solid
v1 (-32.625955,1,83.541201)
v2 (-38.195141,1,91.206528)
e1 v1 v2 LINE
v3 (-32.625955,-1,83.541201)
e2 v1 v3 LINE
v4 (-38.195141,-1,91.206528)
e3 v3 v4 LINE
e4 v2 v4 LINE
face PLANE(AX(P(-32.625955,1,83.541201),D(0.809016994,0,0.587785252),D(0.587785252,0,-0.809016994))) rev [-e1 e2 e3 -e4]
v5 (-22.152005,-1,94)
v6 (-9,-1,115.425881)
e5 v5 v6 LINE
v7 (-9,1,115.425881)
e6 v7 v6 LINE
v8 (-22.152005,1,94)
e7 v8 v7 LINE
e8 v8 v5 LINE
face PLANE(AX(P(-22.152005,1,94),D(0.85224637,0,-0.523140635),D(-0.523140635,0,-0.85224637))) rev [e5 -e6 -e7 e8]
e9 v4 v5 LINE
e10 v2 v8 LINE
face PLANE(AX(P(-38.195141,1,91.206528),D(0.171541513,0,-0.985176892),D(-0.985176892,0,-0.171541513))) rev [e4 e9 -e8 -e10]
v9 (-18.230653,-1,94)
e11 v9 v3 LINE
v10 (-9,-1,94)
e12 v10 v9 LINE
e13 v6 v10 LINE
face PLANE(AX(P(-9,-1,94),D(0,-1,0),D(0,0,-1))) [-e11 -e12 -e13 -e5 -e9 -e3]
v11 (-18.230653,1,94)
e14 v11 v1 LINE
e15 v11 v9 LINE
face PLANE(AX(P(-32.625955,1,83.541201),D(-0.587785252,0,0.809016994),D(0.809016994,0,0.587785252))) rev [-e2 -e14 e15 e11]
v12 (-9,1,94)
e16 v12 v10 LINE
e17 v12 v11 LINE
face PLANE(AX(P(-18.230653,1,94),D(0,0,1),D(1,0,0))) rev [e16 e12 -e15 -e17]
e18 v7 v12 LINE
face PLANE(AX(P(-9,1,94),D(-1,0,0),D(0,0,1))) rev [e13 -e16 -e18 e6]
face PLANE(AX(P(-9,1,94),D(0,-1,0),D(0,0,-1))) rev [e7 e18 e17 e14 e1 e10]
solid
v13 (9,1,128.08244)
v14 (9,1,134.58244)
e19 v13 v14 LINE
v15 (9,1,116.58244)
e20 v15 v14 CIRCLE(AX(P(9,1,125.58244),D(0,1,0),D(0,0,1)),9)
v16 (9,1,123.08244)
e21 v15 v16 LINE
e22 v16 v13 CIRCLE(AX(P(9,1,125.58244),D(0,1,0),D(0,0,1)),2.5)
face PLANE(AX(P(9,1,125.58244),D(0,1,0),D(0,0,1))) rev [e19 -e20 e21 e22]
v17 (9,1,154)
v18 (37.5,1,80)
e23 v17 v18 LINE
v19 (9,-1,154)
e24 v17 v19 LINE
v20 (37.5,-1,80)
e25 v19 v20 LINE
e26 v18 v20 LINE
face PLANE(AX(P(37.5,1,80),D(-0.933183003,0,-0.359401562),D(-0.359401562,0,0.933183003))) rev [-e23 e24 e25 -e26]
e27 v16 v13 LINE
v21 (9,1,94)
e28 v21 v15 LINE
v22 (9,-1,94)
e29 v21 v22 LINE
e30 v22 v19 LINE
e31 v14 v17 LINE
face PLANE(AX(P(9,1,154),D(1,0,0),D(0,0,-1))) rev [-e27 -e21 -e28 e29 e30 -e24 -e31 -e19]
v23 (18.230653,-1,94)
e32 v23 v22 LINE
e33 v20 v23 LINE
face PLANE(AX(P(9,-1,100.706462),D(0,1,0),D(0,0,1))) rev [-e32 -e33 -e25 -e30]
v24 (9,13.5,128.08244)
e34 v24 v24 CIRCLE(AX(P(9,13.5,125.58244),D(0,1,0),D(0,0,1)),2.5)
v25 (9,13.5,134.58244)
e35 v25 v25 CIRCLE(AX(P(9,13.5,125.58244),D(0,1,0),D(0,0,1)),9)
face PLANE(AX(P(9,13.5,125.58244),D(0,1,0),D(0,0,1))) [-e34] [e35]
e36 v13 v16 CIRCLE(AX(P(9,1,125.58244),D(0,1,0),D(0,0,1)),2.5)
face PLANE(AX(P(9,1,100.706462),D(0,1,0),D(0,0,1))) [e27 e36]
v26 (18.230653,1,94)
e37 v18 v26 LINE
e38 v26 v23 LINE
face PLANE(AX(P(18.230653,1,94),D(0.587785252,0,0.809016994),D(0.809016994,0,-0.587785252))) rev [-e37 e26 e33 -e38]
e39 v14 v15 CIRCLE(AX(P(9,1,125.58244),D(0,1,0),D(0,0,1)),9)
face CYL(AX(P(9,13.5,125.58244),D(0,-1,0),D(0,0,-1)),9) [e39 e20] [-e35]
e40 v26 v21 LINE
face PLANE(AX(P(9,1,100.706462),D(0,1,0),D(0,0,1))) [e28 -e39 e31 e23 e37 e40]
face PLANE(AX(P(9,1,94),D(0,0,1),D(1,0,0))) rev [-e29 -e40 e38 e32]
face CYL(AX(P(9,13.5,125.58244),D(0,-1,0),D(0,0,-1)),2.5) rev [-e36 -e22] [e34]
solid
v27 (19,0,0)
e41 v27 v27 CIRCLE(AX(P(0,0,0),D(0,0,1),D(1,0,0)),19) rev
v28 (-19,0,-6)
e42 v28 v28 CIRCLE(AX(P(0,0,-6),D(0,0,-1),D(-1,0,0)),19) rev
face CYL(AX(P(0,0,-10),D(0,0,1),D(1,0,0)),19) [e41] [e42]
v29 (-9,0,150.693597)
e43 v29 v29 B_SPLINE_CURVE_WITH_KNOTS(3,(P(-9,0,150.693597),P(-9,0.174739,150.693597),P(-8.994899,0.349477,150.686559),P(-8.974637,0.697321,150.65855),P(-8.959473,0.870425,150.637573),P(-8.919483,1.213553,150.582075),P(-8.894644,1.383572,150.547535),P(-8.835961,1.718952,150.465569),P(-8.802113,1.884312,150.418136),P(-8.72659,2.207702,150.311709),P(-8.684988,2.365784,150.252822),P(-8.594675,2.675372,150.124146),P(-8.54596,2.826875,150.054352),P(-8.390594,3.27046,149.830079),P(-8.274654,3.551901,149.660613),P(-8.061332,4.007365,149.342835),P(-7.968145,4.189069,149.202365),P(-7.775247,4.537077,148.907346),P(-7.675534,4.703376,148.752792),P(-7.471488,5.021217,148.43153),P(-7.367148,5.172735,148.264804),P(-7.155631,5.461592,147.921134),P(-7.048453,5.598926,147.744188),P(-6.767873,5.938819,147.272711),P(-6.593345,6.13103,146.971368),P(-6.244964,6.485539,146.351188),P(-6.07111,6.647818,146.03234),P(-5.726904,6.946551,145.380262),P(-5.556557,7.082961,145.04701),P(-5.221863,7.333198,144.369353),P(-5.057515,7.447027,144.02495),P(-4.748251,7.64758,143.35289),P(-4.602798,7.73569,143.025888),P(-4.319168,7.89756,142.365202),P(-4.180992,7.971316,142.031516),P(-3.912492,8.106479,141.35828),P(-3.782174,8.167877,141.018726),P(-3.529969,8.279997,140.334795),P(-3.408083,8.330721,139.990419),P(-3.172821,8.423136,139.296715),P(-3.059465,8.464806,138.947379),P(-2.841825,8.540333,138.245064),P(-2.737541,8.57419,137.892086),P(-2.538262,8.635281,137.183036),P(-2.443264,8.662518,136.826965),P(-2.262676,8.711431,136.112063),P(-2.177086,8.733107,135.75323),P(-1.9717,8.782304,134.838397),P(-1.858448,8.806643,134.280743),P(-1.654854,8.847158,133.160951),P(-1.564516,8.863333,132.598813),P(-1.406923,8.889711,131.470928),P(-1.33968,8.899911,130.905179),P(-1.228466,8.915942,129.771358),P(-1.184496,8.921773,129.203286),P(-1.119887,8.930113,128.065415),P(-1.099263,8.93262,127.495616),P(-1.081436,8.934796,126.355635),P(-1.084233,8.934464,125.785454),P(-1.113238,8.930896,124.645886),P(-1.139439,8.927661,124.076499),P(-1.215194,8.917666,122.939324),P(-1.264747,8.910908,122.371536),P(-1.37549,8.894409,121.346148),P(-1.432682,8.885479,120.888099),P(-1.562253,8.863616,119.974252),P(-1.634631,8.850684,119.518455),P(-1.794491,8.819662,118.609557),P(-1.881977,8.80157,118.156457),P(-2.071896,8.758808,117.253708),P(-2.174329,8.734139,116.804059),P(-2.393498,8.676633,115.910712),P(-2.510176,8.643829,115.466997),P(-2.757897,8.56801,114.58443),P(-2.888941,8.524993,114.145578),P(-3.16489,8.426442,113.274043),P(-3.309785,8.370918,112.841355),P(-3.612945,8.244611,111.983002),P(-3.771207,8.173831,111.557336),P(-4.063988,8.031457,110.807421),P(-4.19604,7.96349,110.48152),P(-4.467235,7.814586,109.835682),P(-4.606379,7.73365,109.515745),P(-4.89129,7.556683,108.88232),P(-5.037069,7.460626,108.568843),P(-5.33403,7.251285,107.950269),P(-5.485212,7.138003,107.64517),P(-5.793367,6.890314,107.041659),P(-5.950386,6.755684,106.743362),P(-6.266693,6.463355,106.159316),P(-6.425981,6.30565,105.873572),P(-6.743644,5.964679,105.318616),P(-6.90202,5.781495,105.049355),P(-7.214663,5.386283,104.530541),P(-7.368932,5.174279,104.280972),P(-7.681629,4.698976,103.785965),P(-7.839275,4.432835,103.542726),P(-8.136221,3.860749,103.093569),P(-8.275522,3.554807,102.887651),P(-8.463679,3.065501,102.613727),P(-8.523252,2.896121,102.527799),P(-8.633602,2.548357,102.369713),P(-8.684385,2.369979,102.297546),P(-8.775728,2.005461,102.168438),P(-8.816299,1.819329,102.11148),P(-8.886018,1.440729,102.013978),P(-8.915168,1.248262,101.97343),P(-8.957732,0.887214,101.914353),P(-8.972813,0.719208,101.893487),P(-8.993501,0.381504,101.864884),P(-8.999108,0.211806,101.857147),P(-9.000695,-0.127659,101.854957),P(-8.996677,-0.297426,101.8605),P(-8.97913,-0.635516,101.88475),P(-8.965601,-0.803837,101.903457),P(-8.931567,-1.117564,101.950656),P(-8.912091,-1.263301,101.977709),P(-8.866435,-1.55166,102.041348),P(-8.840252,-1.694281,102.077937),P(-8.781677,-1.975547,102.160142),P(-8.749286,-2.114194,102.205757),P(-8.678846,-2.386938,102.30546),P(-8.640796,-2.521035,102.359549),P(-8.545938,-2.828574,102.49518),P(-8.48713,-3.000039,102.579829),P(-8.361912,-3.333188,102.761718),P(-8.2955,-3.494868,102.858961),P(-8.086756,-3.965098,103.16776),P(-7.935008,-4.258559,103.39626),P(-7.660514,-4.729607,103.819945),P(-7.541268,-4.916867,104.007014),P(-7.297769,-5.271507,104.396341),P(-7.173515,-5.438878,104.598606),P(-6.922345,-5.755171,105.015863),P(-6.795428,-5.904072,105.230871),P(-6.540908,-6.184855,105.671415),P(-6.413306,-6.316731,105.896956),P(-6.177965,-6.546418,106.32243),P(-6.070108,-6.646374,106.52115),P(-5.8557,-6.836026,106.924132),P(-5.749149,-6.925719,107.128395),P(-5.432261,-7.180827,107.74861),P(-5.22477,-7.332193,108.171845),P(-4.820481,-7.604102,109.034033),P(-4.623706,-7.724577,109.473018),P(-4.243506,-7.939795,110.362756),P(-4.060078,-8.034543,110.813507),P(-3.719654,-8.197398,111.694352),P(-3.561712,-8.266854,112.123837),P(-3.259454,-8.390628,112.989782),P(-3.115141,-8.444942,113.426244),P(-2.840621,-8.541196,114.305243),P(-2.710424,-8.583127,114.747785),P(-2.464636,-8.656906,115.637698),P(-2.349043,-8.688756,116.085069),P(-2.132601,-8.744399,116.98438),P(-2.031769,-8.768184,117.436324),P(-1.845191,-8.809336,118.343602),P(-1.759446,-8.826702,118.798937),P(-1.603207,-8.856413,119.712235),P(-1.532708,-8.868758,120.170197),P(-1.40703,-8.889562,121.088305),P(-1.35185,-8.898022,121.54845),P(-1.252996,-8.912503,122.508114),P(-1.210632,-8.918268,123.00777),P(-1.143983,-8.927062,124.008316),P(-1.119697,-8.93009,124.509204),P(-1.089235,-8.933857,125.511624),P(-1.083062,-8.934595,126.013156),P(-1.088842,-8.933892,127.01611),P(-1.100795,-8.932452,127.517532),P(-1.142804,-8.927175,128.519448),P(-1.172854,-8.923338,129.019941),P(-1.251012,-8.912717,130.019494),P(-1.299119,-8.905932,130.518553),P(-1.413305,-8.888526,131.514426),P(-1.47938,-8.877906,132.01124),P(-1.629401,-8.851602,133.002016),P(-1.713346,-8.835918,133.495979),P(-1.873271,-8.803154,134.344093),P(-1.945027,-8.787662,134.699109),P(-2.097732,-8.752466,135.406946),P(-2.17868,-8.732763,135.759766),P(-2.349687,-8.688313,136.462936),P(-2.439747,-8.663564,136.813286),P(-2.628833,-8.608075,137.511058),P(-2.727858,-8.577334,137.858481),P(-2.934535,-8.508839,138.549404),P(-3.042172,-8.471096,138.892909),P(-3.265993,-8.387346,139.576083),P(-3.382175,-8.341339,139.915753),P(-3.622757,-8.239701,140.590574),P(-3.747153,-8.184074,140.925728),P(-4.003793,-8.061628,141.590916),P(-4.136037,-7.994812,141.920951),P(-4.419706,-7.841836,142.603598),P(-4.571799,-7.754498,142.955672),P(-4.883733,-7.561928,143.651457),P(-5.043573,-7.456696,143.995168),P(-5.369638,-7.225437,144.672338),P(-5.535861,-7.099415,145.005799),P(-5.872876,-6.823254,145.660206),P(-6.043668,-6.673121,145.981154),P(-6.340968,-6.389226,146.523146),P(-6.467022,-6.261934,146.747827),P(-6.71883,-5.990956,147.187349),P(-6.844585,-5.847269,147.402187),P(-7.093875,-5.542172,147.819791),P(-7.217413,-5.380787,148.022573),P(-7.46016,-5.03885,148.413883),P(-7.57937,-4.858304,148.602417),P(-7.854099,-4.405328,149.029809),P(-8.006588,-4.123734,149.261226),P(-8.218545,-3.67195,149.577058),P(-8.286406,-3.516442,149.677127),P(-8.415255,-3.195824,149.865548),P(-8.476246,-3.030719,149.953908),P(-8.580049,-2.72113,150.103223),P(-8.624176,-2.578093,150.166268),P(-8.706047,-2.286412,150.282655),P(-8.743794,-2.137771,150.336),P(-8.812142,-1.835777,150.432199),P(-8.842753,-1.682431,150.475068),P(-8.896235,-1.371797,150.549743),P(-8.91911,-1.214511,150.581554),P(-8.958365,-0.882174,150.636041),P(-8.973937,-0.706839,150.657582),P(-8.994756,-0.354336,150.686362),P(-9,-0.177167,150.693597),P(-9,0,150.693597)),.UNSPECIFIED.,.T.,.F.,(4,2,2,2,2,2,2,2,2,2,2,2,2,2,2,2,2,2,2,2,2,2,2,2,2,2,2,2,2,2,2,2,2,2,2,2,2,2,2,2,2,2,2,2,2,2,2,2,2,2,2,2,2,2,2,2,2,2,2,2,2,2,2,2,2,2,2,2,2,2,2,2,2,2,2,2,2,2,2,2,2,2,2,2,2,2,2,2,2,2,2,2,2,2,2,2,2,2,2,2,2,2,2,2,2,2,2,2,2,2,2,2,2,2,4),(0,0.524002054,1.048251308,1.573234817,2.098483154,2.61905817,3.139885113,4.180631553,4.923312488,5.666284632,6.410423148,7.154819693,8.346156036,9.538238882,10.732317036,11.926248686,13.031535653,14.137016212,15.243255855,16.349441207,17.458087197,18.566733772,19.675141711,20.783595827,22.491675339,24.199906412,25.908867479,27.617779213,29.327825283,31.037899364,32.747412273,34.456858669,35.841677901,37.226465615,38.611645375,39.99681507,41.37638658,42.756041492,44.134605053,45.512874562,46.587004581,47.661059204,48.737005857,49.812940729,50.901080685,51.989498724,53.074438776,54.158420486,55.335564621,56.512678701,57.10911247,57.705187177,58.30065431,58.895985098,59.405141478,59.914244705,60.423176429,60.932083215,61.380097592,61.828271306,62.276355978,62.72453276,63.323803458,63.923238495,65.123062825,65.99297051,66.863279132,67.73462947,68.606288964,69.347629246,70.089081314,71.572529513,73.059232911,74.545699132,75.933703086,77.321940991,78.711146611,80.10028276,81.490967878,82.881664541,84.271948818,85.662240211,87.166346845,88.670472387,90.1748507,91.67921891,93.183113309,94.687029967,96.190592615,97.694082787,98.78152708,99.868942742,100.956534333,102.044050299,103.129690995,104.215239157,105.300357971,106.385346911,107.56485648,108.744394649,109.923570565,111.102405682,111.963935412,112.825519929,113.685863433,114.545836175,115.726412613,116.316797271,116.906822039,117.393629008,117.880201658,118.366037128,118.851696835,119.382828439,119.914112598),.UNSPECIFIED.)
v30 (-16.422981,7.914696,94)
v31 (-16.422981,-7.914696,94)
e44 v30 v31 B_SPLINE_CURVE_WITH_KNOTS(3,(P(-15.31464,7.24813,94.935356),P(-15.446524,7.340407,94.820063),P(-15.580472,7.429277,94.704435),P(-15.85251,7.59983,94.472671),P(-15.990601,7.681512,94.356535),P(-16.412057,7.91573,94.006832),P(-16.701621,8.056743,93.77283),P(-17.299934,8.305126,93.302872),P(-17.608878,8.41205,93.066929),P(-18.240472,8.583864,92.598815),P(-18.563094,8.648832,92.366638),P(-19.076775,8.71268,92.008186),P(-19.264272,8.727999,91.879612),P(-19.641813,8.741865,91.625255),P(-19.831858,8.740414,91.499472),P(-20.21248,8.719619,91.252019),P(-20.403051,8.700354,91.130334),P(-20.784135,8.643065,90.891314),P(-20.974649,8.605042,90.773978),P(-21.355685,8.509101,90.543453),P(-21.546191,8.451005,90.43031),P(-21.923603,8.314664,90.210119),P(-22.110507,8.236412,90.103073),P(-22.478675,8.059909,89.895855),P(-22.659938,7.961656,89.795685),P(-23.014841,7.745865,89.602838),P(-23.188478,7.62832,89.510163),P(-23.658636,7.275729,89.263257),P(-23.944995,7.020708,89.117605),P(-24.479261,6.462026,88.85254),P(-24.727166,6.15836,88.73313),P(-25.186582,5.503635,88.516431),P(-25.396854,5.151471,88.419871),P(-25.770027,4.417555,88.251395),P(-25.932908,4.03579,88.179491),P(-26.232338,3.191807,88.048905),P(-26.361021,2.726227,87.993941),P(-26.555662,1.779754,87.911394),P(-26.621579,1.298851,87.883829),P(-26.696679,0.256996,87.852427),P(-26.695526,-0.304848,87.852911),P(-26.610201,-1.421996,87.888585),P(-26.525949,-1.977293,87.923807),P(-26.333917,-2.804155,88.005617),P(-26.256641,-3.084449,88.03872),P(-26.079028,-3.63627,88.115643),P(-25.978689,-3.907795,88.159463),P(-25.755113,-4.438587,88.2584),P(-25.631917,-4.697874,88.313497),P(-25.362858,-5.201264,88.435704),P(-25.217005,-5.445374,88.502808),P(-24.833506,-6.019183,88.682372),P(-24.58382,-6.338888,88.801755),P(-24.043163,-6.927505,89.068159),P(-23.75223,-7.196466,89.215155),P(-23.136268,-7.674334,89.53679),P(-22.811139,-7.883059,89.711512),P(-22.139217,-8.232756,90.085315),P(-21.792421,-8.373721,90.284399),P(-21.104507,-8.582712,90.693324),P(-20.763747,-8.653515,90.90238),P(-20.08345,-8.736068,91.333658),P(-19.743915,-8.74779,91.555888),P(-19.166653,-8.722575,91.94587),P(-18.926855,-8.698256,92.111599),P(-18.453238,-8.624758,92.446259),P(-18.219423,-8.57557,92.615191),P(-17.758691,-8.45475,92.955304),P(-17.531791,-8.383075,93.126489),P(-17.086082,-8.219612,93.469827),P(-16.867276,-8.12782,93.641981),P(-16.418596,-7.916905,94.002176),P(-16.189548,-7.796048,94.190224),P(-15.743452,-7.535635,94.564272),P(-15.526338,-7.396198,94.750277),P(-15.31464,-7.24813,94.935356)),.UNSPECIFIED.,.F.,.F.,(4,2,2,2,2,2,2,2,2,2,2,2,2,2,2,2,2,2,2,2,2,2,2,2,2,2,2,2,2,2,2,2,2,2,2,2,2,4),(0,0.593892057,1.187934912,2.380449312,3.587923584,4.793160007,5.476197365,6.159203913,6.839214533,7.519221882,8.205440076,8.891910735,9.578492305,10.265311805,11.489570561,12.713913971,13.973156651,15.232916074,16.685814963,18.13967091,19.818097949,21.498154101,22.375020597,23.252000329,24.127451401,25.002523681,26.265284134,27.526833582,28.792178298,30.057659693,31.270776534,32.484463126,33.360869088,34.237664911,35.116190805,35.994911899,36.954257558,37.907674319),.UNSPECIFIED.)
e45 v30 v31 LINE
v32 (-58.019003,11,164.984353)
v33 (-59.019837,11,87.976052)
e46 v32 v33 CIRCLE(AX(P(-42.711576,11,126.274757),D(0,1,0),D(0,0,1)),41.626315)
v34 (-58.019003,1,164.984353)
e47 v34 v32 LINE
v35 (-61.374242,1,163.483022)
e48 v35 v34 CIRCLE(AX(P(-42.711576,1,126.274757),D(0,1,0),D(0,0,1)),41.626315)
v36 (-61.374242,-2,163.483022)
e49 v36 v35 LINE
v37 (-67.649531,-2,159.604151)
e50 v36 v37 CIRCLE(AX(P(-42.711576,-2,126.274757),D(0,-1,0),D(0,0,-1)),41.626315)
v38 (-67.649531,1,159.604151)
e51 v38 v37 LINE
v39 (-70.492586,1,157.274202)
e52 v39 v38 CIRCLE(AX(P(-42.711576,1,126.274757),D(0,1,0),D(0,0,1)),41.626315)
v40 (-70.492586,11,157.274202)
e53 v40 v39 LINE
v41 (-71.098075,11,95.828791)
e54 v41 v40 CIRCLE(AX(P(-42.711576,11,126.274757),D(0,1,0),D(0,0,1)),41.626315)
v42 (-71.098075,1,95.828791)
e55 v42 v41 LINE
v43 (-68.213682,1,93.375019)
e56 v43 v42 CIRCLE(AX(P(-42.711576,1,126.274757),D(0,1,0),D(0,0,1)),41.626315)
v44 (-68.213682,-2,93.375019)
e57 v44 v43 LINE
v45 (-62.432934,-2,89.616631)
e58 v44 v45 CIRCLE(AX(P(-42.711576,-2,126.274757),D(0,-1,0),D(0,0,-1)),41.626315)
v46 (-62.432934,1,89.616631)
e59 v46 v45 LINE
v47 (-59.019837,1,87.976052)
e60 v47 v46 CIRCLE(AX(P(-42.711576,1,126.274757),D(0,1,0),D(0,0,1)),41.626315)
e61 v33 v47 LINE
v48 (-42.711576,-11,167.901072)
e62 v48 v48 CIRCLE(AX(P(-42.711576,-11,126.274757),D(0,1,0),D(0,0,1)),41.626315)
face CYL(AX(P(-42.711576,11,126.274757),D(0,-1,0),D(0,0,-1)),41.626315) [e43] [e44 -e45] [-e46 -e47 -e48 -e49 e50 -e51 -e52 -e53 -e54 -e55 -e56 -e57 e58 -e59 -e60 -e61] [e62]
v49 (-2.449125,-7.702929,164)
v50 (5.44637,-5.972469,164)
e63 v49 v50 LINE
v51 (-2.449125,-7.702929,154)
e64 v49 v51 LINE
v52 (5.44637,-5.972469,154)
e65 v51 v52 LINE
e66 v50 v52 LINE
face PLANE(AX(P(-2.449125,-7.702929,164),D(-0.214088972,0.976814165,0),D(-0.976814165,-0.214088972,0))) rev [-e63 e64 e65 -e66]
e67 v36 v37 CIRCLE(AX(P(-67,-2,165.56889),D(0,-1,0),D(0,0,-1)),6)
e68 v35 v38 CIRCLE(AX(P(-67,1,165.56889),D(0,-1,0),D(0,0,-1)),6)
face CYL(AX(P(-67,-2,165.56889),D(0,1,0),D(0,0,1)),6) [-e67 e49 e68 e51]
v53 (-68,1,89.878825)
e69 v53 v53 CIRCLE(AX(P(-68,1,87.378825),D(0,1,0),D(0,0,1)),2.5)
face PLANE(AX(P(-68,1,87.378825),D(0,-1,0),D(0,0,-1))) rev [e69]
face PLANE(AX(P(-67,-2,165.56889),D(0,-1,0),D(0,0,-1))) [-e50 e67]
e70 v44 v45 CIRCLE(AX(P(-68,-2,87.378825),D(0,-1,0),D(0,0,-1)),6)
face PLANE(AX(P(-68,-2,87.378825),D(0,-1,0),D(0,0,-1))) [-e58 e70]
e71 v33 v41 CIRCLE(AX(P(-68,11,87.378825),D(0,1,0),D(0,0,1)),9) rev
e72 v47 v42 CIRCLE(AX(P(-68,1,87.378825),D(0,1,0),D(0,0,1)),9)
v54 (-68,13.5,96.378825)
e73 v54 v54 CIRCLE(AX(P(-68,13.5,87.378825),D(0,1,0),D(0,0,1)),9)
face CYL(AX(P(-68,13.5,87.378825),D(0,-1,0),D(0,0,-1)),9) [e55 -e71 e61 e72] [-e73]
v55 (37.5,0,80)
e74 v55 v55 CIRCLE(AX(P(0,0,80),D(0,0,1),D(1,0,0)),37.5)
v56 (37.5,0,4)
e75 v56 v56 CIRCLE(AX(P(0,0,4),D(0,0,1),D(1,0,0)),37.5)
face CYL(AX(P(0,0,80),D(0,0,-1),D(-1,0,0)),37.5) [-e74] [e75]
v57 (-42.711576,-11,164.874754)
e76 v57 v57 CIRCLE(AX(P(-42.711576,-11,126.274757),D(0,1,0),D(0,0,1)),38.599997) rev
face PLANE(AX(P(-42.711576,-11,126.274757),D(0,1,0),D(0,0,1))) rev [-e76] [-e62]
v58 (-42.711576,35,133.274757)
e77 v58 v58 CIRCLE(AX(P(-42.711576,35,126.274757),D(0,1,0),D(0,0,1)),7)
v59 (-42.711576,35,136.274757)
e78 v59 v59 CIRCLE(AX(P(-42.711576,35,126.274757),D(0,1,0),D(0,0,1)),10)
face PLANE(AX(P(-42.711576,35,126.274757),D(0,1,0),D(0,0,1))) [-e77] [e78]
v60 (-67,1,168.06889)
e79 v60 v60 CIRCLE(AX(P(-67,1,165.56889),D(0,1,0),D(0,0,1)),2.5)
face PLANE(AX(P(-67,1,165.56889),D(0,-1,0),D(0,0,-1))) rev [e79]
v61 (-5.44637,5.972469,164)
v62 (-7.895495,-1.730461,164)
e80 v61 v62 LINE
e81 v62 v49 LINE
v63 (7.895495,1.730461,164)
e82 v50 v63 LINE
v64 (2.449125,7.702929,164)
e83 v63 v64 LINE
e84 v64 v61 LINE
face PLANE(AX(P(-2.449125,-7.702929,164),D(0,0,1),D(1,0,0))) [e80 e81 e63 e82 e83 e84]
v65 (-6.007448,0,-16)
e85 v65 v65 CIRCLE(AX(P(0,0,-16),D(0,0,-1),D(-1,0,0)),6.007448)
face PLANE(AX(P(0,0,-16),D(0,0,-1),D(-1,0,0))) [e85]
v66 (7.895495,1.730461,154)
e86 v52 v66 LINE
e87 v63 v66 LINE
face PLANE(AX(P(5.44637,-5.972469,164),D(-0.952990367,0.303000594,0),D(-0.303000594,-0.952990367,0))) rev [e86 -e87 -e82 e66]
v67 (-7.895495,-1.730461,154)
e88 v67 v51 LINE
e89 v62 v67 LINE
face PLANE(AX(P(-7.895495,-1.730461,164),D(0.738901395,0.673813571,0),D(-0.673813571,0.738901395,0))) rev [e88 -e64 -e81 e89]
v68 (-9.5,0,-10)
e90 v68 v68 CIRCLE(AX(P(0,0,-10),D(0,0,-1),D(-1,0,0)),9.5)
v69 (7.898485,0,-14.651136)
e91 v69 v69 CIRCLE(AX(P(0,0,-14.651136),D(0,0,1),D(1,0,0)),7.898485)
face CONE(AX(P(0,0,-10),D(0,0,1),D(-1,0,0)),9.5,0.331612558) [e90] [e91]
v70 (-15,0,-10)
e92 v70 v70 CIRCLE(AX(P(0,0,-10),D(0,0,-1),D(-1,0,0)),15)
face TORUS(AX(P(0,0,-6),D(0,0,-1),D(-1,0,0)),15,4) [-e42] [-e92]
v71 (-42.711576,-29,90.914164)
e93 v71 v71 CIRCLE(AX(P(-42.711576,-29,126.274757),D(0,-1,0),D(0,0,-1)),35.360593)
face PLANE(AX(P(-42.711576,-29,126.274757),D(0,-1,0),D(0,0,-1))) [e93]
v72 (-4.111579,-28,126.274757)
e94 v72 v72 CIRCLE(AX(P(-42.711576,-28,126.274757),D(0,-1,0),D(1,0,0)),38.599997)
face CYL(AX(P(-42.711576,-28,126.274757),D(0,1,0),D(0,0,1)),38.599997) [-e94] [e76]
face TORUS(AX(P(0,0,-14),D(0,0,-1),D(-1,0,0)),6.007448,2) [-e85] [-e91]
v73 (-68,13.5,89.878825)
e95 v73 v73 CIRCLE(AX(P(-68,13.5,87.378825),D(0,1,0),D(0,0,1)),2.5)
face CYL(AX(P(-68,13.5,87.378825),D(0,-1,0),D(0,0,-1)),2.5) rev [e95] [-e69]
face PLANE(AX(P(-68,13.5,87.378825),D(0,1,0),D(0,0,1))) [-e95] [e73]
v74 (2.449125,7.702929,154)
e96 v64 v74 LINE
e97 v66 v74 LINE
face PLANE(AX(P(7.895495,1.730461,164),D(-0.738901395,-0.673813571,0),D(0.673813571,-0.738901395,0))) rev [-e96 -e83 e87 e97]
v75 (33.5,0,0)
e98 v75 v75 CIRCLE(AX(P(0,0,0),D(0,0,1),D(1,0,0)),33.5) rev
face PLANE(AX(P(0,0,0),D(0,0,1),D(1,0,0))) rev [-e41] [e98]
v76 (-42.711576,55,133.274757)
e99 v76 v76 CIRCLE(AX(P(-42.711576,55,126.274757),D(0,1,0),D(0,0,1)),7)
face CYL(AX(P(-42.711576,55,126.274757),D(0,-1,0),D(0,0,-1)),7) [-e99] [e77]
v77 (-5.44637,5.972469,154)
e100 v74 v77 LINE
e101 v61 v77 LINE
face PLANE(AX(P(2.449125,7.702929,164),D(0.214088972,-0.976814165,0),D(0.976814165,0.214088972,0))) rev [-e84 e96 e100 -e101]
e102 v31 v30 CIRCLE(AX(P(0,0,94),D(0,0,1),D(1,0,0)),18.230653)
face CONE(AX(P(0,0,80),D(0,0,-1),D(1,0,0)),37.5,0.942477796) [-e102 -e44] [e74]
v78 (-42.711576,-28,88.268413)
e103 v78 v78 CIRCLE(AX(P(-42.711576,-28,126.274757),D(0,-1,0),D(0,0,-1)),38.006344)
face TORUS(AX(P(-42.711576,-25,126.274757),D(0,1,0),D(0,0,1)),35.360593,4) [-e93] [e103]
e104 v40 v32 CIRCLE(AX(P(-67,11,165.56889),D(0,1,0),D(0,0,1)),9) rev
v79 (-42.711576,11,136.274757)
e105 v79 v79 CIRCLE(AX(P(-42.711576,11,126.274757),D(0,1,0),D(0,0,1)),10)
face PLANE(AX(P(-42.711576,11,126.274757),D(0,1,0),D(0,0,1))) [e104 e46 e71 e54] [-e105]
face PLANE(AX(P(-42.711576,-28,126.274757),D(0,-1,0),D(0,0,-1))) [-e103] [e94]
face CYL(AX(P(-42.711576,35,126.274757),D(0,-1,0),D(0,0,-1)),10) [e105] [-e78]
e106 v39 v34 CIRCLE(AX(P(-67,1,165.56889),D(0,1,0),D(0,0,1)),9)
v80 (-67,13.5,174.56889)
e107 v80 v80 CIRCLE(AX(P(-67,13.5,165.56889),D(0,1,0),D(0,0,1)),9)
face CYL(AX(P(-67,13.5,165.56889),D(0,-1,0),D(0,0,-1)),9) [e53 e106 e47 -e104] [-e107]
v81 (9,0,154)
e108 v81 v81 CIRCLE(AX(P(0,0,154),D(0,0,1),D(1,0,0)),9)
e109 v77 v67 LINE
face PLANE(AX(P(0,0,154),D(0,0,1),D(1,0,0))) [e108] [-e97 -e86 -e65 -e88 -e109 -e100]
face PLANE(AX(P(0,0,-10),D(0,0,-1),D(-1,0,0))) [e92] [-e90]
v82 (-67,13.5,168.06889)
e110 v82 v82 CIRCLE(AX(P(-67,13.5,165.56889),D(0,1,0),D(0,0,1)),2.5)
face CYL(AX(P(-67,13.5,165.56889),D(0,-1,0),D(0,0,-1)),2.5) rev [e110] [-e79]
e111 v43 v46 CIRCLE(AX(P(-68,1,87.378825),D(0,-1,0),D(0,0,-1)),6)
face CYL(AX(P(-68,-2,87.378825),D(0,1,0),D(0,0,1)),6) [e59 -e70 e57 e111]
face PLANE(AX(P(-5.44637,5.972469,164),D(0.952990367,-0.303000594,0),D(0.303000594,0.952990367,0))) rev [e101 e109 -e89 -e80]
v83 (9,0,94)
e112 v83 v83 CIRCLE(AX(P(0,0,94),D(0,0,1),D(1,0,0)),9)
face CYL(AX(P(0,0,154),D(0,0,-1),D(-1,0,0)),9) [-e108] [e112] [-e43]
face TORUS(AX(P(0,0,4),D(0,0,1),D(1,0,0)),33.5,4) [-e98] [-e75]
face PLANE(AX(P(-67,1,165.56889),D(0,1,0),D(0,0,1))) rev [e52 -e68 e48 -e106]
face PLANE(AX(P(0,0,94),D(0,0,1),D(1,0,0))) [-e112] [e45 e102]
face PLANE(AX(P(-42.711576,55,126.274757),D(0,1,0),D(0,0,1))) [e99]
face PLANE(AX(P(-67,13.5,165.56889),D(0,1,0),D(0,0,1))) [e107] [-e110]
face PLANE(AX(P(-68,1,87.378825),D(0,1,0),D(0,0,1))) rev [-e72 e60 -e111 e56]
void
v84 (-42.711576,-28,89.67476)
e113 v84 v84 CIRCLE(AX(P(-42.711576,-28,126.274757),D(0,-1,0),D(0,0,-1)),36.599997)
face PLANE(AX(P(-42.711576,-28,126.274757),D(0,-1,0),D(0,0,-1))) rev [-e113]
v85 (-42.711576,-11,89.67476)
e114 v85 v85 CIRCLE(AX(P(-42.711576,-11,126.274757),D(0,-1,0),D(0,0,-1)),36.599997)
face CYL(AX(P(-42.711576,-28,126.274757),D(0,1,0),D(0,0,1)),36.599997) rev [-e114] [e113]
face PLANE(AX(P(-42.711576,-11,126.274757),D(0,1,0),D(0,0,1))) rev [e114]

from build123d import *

# Parameters (mm, degrees)
SKETCH_1_R               = 37.5
EXTRUDE_1_DEPTH          = 80
SKETCH_2_R               = 19
EXTRUDE_2_DEPTH          = 10
SKETCH_3_R               = 9.5
EXTRUDE_3_DEPTH          = 6
EXTRUDE_3_TAPER          = 19
FILLET_1_R               = 2
FILLET_2_R               = 4
FILLET_3_R               = 4
SKETCH_5_R               = 37.5
EXTRUDE_4_DEPTH          = 14
EXTRUDE_4_TAPER          = 54
SKETCH_6_R               = 9
EXTRUDE_5_DEPTH          = 60
EXTRUDE_START            = -1
EXTRUDE_9_DEPTH          = 2
EXTRUDE_9_2_DEPTH        = 2
EXTRUDE_START_2          = -11
SKETCH_8_R               = 41.626315452
EXTRUDE_12_DEPTH         = 22
EXTRUDE_13_DEPTH         = 10
SKETCH_11_R              = 38.599997009
SKETCH_11_R_2            = 36.599997009
EXTRUDE_1_2_DEPTH        = 17
SKETCH_12_R              = 38.006343928
EXTRUDE_14_DEPTH         = 1
FILLET_4_R               = 4
SKETCH_14_R              = 10
EXTRUDE_15_DEPTH         = 24
SKETCH_27_R              = 7
EXTRUDE_19_DEPTH         = 20
EXTRUDE_23_OUTLINE_R     = 9
EXTRUDE_23_OUTLINE_R_2   = 2.5
EXTRUDE_23_DEPTH         = 12.5
EXTRUDE_23_2_OUTLINE_R   = 9
EXTRUDE_23_2_OUTLINE_R_2 = 2.5
EXTRUDE_23_2_DEPTH       = 12.5
SKETCH_40_R              = 6
EXTRUDE_24_DEPTH         = 3


# Read off the part's stored shape, not the designer's step: Вытянуть23
with BuildPart() as part:
    # Эскиз1 → Extrude 1 (new body)
    with BuildSketch(Plane.XY):
        Circle(SKETCH_1_R)
    extrude(amount=EXTRUDE_1_DEPTH)

    # Эскиз2 → Вытянуть2 (add)
    with BuildSketch(Plane(origin=(0, 0, 0), x_dir=(-1, 0, 0), z_dir=(0, 0, -1))):
        with Locations(Location((0, 0, 0), (0, 0, 180))):
            Circle(SKETCH_2_R)
    extrude(amount=EXTRUDE_2_DEPTH)

    # Эскиз3 → Вытянуть3 (add)
    with BuildSketch(Plane(origin=(0, 0, -10), x_dir=(-1, 0, 0), z_dir=(0, 0, -1))):
        Circle(SKETCH_3_R)
    extrude(amount=EXTRUDE_3_DEPTH, taper=EXTRUDE_3_TAPER)

    # Скругление1
    fillet_1_edges = [part.edges().sort_by_distance(p)[0] for p in [
        (7.43403432, 0, -16),
    ]]
    fillet(fillet_1_edges, radius=FILLET_1_R)

    # Скругление2
    fillet_2_edges = [part.edges().sort_by_distance(p)[0] for p in [
        (-19, 0, -10),
    ]]
    fillet(fillet_2_edges, radius=FILLET_2_R)

    # Скругление3
    fillet_3_edges = [part.edges().sort_by_distance(p)[0] for p in [
        (-37.5, 0, 0),
    ]]
    fillet(fillet_3_edges, radius=FILLET_3_R)

    # Эскиз5 → Вытянуть4 (add)
    with BuildSketch(Plane.XY.offset(80)):
        Circle(SKETCH_5_R)
    extrude(amount=EXTRUDE_4_DEPTH, taper=EXTRUDE_4_TAPER)

    # Эскиз6 → Вытянуть5 (add)
    with BuildSketch(Plane.XY.offset(94)):
        Circle(SKETCH_6_R)
    extrude(amount=EXTRUDE_5_DEPTH)



with BuildPart() as body_2:
    # Эскиз7 → Вытянуть9 (new body)
    with BuildSketch(Plane(origin=(0, 0, 0), x_dir=(1, 0, 0), z_dir=(0, 1, 0)).offset(EXTRUDE_START)):
        Polygon((37.5, -80), (9, -154), (9, -94), (18.230653113, -94), align=None)
    extrude(amount=EXTRUDE_9_DEPTH)

    # Вытянуть23 outline → Вытянуть23 (add)
    with BuildSketch(Plane(origin=(0, 1, 0), x_dir=(1, 0, 0), z_dir=(0, 1, 0))):
        with Locations((9, -125.582440014)):
            Circle(EXTRUDE_23_OUTLINE_R)
        with Locations((9, -125.582440014)):
            Circle(EXTRUDE_23_OUTLINE_R_2, mode=Mode.SUBTRACT)
    extrude(amount=EXTRUDE_23_DEPTH)


with BuildPart() as body_3:
    # Эскиз7 → Extrude 9 2 (new body)
    with BuildSketch(Plane(origin=(0, 0, 0), x_dir=(1, 0, 0), z_dir=(0, 1, 0)).offset(EXTRUDE_START)):
        Polygon((-32.625954593, -83.541201272), (-18.230653113, -94), (-9, -94), (-9, -115.425880537), (-22.152005265, -94), (-38.1951407, -91.206528342), align=None)
    extrude(amount=EXTRUDE_9_2_DEPTH)


with BuildPart() as body_4:
    # Эскиз8 → Вытянуть12 (new body)
    with BuildSketch(Plane(origin=(0, 0, 0), x_dir=(1, 0, 0), z_dir=(0, 1, 0)).offset(EXTRUDE_START_2)):
        with Locations(Location((-42.711575953, -126.274756618, 0), (0, 0, 270))):
            Circle(SKETCH_8_R)
    extrude(amount=EXTRUDE_12_DEPTH)


with BuildPart() as part_1:
    add(part.part)

    add(body_4.part)  # Вытянуть13 merges body 4
    # Эскиз9 → Вытянуть13 (add)
    with BuildSketch(Plane.XY.offset(154)):
        Polygon((-2.449124643, -7.702929431), (5.446370249, -5.972468873), (7.895494892, 1.730460558), (2.449124643, 7.702929431), (-5.446370249, 5.972468873), (-7.895494892, -1.730460558), align=None)
    extrude(amount=EXTRUDE_13_DEPTH)

    # Эскиз11 → Extrude 1 2 (add)
    with BuildSketch(Plane.XZ.offset(11)):
        with Locations((-42.711575953, 126.274756618)):
            Circle(SKETCH_11_R)
        with Locations((-42.711575953, 126.274756618)):
            Circle(SKETCH_11_R_2, mode=Mode.SUBTRACT)
    extrude(amount=EXTRUDE_1_2_DEPTH)

    # Эскиз12 → Вытянуть14 (add)
    with BuildSketch(Plane.XZ.offset(28)):
        with Locations(Location((-42.711575953, 126.274756618, 0), (0, 0, 270))):
            Circle(SKETCH_12_R)
    extrude(amount=EXTRUDE_14_DEPTH)

    # Скругление4
    # the kernel refuses this fillet: 4 mm, written as the material it takes off along each edge
    with BuildSketch(Plane(origin=(-42.711575953, -29, 126.274756618), x_dir=(0, 0, -1), z_dir=(-1, 0, 0))) as fillet_4_piece_1:
        with BuildLine():
            CenterArc((35.360592617, -4), FILLET_4_R, 48.590377891, 41.409622109)
            Line((35.360592617, 0), (35.360592617, 0.08))
            Line((35.360592617, 0.08), (38.006343928, 0.08))
            Line((38.006343928, 0.08), (38.086343928, 0))
            ThreePointArc((38.086343928, 0), (38.086343928, -0.5), (38.059258954, -0.94))
            Line((38.059258954, -0.94), (38.006343928, -1))
        make_face()
    revolve(axis=Axis((-42.711575953, -29, 126.274756618), (0, -1, 0)), mode=Mode.SUBTRACT)

    # Эскиз14 → Вытянуть15 (add)
    with BuildSketch(Plane(origin=(0, 11, 0), x_dir=(1, 0, 0), z_dir=(0, 1, 0))):
        with Locations(Location((-42.711575953, -126.274756618, 0), (0, 0, 270))):
            Circle(SKETCH_14_R)
    extrude(amount=EXTRUDE_15_DEPTH)

    # Эскиз27 → Вытянуть19 (add)
    with BuildSketch(Plane(origin=(0, 35, 0), x_dir=(1, 0, 0), z_dir=(0, 1, 0))):
        with Locations(Location((-42.711575953, -126.274756618, 0), (0, 0, 270))):
            Circle(SKETCH_27_R)
    extrude(amount=EXTRUDE_19_DEPTH)

    # Extrude 23 2 outline → Extrude 23 2 (add)
    # profile 1 of 2: a face of its own
    with BuildSketch(Plane(origin=(0, 1, 0), x_dir=(1, 0, 0), z_dir=(0, 1, 0))):
        with Locations((-68, -87.378825206)):
            Circle(EXTRUDE_23_2_OUTLINE_R)
        with Locations((-68, -87.378825206)):
            Circle(EXTRUDE_23_2_OUTLINE_R_2, mode=Mode.SUBTRACT)
    # profile 2 of 2: a face of its own
    with BuildSketch(Plane(origin=(0, 1, 0), x_dir=(1, 0, 0), z_dir=(0, 1, 0))):
        with Locations((-67, -165.568890181)):
            Circle(EXTRUDE_23_2_OUTLINE_R)
        with Locations((-67, -165.568890181)):
            Circle(EXTRUDE_23_2_OUTLINE_R_2, mode=Mode.SUBTRACT)
    extrude(amount=EXTRUDE_23_2_DEPTH)

    # Эскиз40 → Вытянуть24 (add)
    with BuildSketch(Plane.XZ.offset(-1)):
        with Locations((-68, 87.378825206)):
            Circle(SKETCH_40_R)
        with Locations((-67, 165.568890181)):
            Circle(SKETCH_40_R)
    extrude(amount=EXTRUDE_24_DEPTH)


solid = Compound([body_2.part, body_3.part, part_1.part])
